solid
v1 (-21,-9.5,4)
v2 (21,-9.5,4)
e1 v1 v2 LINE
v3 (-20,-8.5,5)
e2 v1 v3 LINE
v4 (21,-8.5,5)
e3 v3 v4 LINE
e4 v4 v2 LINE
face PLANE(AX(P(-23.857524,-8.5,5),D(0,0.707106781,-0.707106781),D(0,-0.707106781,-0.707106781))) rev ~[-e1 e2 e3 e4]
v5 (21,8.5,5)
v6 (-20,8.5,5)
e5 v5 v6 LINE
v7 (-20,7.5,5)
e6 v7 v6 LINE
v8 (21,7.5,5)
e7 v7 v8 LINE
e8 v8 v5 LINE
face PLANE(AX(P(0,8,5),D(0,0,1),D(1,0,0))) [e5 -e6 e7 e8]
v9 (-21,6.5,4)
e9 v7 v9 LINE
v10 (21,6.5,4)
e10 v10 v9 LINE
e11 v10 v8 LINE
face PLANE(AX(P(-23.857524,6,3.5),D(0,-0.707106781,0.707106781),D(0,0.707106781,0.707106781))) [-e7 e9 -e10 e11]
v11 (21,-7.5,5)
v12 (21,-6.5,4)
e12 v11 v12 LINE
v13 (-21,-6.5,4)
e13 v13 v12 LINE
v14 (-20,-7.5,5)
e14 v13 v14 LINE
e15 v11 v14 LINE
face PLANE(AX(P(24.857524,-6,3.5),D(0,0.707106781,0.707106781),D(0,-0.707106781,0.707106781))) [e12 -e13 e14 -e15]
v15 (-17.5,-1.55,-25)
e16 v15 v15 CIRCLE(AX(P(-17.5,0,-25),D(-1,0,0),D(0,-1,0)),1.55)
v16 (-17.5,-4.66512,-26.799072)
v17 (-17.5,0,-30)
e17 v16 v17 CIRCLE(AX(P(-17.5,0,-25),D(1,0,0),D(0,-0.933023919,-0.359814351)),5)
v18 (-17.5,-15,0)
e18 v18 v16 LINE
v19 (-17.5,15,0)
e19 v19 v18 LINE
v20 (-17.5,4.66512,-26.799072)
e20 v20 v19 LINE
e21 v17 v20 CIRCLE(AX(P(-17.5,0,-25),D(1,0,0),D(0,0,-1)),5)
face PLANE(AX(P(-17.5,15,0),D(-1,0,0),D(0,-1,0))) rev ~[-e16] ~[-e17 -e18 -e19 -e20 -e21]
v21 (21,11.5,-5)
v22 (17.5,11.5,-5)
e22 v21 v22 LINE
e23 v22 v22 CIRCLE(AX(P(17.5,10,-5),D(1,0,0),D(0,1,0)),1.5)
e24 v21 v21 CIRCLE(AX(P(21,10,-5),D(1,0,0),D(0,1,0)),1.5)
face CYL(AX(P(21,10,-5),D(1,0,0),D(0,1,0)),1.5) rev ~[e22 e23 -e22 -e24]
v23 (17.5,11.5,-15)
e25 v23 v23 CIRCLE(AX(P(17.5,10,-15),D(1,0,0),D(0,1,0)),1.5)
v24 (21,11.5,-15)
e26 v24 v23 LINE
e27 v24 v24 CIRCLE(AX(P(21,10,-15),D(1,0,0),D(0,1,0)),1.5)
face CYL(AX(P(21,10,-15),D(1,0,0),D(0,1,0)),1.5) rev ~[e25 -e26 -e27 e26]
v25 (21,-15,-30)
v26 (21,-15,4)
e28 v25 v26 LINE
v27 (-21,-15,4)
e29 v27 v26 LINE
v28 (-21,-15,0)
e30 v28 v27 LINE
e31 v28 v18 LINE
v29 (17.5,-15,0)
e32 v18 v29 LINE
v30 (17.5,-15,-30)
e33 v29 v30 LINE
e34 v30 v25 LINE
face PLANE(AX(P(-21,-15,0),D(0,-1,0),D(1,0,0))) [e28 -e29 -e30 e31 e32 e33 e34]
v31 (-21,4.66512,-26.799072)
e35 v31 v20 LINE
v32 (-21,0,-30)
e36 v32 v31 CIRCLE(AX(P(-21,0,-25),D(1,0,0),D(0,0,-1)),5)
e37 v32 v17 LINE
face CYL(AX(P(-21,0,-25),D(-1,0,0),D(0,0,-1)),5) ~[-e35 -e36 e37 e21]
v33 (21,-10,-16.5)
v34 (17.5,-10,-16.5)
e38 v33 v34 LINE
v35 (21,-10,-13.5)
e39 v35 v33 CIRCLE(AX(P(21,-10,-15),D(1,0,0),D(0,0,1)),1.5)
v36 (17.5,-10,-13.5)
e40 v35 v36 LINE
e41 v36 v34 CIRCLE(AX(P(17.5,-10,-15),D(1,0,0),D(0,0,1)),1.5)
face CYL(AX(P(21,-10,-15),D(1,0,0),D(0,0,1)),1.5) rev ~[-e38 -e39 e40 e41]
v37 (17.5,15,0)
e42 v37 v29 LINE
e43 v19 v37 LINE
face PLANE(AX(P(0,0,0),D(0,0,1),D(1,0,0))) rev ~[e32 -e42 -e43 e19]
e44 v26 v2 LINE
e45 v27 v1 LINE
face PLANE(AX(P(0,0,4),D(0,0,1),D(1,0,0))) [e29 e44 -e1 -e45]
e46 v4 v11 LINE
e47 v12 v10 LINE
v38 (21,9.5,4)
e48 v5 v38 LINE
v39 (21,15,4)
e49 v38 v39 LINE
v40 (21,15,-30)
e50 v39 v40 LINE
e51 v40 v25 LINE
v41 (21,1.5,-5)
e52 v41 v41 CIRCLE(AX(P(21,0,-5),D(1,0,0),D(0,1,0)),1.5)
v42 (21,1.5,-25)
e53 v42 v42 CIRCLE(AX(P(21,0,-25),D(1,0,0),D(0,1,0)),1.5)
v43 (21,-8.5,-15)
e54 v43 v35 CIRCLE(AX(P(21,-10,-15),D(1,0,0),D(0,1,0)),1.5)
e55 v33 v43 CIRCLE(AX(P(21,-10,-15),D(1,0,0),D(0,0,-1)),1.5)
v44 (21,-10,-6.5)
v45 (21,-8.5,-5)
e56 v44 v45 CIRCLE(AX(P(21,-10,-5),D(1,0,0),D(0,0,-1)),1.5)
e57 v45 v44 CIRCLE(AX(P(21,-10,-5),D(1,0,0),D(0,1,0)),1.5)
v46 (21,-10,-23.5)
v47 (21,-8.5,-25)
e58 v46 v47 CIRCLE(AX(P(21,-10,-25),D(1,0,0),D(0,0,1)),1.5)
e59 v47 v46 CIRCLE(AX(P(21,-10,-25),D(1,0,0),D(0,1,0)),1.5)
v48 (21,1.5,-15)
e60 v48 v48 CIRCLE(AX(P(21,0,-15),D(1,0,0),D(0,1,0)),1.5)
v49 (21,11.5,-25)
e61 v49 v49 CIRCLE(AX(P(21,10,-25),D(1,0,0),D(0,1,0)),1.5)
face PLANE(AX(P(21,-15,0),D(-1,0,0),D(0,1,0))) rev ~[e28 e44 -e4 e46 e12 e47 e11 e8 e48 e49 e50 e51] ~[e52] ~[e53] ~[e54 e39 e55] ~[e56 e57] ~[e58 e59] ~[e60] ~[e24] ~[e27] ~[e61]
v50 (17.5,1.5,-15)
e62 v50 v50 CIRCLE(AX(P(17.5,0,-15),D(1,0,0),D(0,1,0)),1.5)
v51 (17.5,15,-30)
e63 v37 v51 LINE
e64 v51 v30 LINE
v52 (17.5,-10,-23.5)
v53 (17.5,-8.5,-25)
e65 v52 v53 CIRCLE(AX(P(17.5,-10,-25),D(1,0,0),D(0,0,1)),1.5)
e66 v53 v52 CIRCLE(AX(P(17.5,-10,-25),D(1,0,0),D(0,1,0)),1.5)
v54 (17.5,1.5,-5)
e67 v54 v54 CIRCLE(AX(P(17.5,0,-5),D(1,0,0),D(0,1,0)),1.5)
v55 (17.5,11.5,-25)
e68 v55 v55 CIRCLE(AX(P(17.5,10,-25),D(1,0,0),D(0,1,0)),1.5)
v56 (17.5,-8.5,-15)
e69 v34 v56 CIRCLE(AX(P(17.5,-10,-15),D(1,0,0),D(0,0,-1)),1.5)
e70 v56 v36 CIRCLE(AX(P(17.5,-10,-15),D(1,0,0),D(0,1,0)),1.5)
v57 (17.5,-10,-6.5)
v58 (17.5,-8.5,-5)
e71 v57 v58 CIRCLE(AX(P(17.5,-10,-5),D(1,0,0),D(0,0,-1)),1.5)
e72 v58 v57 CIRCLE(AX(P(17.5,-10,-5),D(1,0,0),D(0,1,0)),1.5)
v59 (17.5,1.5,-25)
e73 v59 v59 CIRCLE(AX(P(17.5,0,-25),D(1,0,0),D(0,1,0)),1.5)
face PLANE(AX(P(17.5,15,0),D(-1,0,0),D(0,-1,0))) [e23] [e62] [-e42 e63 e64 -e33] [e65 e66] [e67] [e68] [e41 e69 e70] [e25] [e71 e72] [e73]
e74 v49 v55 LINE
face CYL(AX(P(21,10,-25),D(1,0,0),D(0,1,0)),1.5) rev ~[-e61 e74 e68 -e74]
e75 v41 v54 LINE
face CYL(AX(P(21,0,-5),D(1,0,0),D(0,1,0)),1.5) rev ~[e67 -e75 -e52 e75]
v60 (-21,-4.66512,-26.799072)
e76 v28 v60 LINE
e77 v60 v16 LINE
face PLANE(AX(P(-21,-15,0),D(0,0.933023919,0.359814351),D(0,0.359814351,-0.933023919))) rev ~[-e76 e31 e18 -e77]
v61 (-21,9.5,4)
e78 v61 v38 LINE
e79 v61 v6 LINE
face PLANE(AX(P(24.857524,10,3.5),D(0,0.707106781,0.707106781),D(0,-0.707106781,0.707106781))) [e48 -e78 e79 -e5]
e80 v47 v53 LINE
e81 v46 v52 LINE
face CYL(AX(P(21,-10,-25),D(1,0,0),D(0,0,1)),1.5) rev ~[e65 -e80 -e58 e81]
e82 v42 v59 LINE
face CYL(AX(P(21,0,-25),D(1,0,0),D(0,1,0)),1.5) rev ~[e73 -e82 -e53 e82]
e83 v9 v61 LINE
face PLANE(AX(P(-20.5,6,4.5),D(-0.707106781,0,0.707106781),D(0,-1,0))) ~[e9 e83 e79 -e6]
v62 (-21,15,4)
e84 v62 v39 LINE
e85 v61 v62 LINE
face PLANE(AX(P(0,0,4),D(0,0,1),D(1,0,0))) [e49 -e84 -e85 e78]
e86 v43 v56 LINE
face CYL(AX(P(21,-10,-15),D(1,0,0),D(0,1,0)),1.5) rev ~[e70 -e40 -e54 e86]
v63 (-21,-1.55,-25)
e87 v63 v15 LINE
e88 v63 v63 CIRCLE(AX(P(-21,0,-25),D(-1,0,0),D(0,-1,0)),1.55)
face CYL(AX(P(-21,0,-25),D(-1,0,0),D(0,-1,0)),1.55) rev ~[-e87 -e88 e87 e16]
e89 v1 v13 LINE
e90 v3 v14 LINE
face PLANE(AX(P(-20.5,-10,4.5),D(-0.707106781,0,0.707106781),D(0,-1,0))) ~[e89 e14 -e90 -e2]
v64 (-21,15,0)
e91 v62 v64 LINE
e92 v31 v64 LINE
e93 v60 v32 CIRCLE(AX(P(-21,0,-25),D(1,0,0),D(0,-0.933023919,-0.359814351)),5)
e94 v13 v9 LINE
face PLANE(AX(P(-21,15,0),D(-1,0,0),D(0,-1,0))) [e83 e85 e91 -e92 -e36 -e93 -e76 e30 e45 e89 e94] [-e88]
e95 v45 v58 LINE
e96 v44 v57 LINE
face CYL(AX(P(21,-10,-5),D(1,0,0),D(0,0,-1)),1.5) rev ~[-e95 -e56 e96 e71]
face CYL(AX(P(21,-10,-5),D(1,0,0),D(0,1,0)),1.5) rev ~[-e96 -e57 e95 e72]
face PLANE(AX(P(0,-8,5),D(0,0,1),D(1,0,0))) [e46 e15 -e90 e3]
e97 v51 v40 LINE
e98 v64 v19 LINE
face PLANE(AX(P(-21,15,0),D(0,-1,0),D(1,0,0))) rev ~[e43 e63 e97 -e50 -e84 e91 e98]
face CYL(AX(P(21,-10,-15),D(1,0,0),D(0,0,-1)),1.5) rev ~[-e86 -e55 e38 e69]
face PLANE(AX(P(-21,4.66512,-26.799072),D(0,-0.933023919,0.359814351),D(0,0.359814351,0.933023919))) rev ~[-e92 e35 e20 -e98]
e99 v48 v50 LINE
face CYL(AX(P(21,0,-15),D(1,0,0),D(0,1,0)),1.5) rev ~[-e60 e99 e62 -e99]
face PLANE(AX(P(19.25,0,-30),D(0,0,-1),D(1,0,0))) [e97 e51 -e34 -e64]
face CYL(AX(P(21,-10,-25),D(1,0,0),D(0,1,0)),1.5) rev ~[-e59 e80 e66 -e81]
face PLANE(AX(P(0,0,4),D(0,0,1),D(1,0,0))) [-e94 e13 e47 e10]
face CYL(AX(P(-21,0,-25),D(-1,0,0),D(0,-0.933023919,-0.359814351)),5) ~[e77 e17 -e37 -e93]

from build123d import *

# Parameters (mm, degrees)
F0_W          = 42
F0_H          = 30
F1_DEPTH      = 4
F2_W          = 3.5
F2_H          = 30
F3_DEPTH      = 30
F4_R          = 1.55
F5_DEPTH      = 5
F7_DEPTH      = 3.5
F8_W          = 42
F8_H          = 4
F9_DEPTH      = 1
F10_SIZE      = 1
F11_T4_DEPTH  = 48.7150489639
F11_T9_DEPTH  = 48.7150489639
F11_T14_DEPTH = 48.7150489639
F11_T19_DEPTH = 48.7150489639
F12_R         = 1.5
F13_DEPTH     = 3.5


# Not quite as in the source:
# - a fillet or chamfer that OpenCascade refuses, or shapes differently, is made with other operations: its cross-section is extruded or revolved along the edge and cut away or added


with BuildPart() as f1:
    # F0 (on Top) → F1 (new body)
    with BuildSketch(Plane.XY):
        Rectangle(F0_W, F0_H)
    extrude(amount=F1_DEPTH)

    # F2 (on face) → F3 (join)
    with BuildSketch(Plane(origin=(0, 0, 0), x_dir=(1, 0, 0), z_dir=(0, 0, -1))):
        with Locations((-19.25, 0)):
            Rectangle(F2_W, F2_H)
        with Locations((19.25, 0)):
            Rectangle(F2_W, F2_H)
    extrude(amount=F3_DEPTH)

    # F4 (on face) → F5 (cut)
    with BuildSketch(Plane(origin=(-21, 0, 0), x_dir=(0, -1, 0), z_dir=(-1, 0, 0))):
        with Locations((0, -25)):
            Circle(F4_R)
    extrude(amount=-F5_DEPTH, mode=Mode.SUBTRACT)

    # F6 (on face) → F7 (cut)
    with BuildSketch(Plane(origin=(-21, 0, 0), x_dir=(0, -1, 0), z_dir=(-1, 0, 0))):
        with BuildLine():
            ThreePointArc((0, -30), (-2.8288373248, -29.1228242007), (-4.665119593, -26.7990717558))
            Line((-4.665119593, -26.7990717558), (-15, 0))
            Line((-15, 0), (-15, -30))
            Line((-15, -30), (0, -30))
        make_face()
        with BuildLine():
            ThreePointArc((4.665119593, -26.7990717558), (2.8288373248, -29.1228242007), (0, -30))
            Line((0, -30), (15, -30))
            Line((15, -30), (15, 0))
            Line((15, 0), (4.665119593, -26.7990717558))
        make_face()
    extrude(amount=-F7_DEPTH, mode=Mode.SUBTRACT)

    # F8 (on face) → F9 (join)
    with BuildSketch(Plane.XY.offset(4)):
        with Locations((0, 8)):
            Rectangle(F8_W, F8_H)
        with Locations((0, -8)):
            Rectangle(F8_W, F8_H)
    extrude(amount=F9_DEPTH)

    # F10
    f10_edges = [f1.edges().sort_by_distance(p)[0] for p in [
        (-21, -8, 5),
        (-21, 8, 5),
    ]]
    chamfer(f10_edges, length=F10_SIZE)

    # F11: chamfer of 1.5 on 4 edges, made by hand


with BuildPart() as f11_tool2:
    # F11_s3 → F11_t4 (new body)
    with BuildSketch(Plane.YZ.offset(-23.8575244819)):
        Polygon((-8.5, 5), (-10, 3.5), (-10, 5), align=None)
    extrude(amount=F11_T4_DEPTH)

    split(bisect_by=Plane.XY.offset(4), keep=Keep.TOP)


with BuildPart() as f1_1:
    add(f1.part)

    # F11_t1: cut F11_tool2
    add(f11_tool2.part, mode=Mode.SUBTRACT)


with BuildPart() as f11_tool7:
    # F11_s8 → F11_t9 (new body)
    with BuildSketch(Plane.YZ.offset(24.8575244819)):
        Polygon((-6, 3.5), (-7.5, 5), (-6, 5), align=None)
    extrude(amount=-F11_T9_DEPTH)

    split(bisect_by=Plane.XY.offset(4), keep=Keep.TOP)


with BuildPart() as f1_2:
    add(f1_1.part)

    # F11_t6: cut F11_tool7
    add(f11_tool7.part, mode=Mode.SUBTRACT)


with BuildPart() as f11_tool12:
    # F11_s13 → F11_t14 (new body)
    with BuildSketch(Plane.YZ.offset(-23.8575244819)):
        Polygon((6, 3.5), (7.5, 5), (6, 5), align=None)
    extrude(amount=F11_T14_DEPTH)

    split(bisect_by=Plane.XY.offset(4), keep=Keep.TOP)


with BuildPart() as f1_3:
    add(f1_2.part)

    # F11_t11: cut F11_tool12
    add(f11_tool12.part, mode=Mode.SUBTRACT)


with BuildPart() as f11_tool17:
    # F11_s18 → F11_t19 (new body)
    with BuildSketch(Plane.YZ.offset(24.8575244819)):
        Polygon((10, 3.5), (8.5, 5), (10, 5), align=None)
    extrude(amount=-F11_T19_DEPTH)

    split(bisect_by=Plane.XY.offset(4), keep=Keep.TOP)


with BuildPart() as f1_4:
    add(f1_3.part)

    # F11_t16: cut F11_tool17
    add(f11_tool17.part, mode=Mode.SUBTRACT)

    # F12 (on face) → F13 (cut)
    with BuildSketch(Plane.YZ.offset(21)):
        with BuildLine():
            ThreePointArc((-10, -6.5), (-8.9393398282, -6.0606601718), (-8.5, -5))
            ThreePointArc((-8.5, -5), (-11.0606601718, -3.9393398282), (-10, -6.5))
        make_face()
        with BuildLine():
            ThreePointArc((-8.5, -25), (-8.9393398282, -23.9393398282), (-10, -23.5))
            ThreePointArc((-10, -23.5), (-11.0606601718, -26.0606601718), (-8.5, -25))
        make_face()
        with BuildLine():
            ThreePointArc((-8.5, -15), (-8.9393398282, -13.9393398282), (-10, -13.5))
            Line((-10, -13.5), (-10, -16.5))
            ThreePointArc((-10, -16.5), (-8.9393398282, -16.0606601718), (-8.5, -15))
        make_face()
        with BuildLine():
            Line((-10, -16.5), (-10, -13.5))
            ThreePointArc((-10, -13.5), (-11.5, -15), (-10, -16.5))
        make_face()
        with Locations((0, -5)):
            Circle(F12_R)
        with Locations((10, -5)):
            Circle(F12_R)
        with Locations((0, -15)):
            Circle(F12_R)
        with Locations((0, -25)):
            Circle(F12_R)
        with Locations((10, -15)):
            Circle(F12_R)
        with Locations((10, -25)):
            Circle(F12_R)
    extrude(amount=-F13_DEPTH, mode=Mode.SUBTRACT)


solid = f1_4.part
